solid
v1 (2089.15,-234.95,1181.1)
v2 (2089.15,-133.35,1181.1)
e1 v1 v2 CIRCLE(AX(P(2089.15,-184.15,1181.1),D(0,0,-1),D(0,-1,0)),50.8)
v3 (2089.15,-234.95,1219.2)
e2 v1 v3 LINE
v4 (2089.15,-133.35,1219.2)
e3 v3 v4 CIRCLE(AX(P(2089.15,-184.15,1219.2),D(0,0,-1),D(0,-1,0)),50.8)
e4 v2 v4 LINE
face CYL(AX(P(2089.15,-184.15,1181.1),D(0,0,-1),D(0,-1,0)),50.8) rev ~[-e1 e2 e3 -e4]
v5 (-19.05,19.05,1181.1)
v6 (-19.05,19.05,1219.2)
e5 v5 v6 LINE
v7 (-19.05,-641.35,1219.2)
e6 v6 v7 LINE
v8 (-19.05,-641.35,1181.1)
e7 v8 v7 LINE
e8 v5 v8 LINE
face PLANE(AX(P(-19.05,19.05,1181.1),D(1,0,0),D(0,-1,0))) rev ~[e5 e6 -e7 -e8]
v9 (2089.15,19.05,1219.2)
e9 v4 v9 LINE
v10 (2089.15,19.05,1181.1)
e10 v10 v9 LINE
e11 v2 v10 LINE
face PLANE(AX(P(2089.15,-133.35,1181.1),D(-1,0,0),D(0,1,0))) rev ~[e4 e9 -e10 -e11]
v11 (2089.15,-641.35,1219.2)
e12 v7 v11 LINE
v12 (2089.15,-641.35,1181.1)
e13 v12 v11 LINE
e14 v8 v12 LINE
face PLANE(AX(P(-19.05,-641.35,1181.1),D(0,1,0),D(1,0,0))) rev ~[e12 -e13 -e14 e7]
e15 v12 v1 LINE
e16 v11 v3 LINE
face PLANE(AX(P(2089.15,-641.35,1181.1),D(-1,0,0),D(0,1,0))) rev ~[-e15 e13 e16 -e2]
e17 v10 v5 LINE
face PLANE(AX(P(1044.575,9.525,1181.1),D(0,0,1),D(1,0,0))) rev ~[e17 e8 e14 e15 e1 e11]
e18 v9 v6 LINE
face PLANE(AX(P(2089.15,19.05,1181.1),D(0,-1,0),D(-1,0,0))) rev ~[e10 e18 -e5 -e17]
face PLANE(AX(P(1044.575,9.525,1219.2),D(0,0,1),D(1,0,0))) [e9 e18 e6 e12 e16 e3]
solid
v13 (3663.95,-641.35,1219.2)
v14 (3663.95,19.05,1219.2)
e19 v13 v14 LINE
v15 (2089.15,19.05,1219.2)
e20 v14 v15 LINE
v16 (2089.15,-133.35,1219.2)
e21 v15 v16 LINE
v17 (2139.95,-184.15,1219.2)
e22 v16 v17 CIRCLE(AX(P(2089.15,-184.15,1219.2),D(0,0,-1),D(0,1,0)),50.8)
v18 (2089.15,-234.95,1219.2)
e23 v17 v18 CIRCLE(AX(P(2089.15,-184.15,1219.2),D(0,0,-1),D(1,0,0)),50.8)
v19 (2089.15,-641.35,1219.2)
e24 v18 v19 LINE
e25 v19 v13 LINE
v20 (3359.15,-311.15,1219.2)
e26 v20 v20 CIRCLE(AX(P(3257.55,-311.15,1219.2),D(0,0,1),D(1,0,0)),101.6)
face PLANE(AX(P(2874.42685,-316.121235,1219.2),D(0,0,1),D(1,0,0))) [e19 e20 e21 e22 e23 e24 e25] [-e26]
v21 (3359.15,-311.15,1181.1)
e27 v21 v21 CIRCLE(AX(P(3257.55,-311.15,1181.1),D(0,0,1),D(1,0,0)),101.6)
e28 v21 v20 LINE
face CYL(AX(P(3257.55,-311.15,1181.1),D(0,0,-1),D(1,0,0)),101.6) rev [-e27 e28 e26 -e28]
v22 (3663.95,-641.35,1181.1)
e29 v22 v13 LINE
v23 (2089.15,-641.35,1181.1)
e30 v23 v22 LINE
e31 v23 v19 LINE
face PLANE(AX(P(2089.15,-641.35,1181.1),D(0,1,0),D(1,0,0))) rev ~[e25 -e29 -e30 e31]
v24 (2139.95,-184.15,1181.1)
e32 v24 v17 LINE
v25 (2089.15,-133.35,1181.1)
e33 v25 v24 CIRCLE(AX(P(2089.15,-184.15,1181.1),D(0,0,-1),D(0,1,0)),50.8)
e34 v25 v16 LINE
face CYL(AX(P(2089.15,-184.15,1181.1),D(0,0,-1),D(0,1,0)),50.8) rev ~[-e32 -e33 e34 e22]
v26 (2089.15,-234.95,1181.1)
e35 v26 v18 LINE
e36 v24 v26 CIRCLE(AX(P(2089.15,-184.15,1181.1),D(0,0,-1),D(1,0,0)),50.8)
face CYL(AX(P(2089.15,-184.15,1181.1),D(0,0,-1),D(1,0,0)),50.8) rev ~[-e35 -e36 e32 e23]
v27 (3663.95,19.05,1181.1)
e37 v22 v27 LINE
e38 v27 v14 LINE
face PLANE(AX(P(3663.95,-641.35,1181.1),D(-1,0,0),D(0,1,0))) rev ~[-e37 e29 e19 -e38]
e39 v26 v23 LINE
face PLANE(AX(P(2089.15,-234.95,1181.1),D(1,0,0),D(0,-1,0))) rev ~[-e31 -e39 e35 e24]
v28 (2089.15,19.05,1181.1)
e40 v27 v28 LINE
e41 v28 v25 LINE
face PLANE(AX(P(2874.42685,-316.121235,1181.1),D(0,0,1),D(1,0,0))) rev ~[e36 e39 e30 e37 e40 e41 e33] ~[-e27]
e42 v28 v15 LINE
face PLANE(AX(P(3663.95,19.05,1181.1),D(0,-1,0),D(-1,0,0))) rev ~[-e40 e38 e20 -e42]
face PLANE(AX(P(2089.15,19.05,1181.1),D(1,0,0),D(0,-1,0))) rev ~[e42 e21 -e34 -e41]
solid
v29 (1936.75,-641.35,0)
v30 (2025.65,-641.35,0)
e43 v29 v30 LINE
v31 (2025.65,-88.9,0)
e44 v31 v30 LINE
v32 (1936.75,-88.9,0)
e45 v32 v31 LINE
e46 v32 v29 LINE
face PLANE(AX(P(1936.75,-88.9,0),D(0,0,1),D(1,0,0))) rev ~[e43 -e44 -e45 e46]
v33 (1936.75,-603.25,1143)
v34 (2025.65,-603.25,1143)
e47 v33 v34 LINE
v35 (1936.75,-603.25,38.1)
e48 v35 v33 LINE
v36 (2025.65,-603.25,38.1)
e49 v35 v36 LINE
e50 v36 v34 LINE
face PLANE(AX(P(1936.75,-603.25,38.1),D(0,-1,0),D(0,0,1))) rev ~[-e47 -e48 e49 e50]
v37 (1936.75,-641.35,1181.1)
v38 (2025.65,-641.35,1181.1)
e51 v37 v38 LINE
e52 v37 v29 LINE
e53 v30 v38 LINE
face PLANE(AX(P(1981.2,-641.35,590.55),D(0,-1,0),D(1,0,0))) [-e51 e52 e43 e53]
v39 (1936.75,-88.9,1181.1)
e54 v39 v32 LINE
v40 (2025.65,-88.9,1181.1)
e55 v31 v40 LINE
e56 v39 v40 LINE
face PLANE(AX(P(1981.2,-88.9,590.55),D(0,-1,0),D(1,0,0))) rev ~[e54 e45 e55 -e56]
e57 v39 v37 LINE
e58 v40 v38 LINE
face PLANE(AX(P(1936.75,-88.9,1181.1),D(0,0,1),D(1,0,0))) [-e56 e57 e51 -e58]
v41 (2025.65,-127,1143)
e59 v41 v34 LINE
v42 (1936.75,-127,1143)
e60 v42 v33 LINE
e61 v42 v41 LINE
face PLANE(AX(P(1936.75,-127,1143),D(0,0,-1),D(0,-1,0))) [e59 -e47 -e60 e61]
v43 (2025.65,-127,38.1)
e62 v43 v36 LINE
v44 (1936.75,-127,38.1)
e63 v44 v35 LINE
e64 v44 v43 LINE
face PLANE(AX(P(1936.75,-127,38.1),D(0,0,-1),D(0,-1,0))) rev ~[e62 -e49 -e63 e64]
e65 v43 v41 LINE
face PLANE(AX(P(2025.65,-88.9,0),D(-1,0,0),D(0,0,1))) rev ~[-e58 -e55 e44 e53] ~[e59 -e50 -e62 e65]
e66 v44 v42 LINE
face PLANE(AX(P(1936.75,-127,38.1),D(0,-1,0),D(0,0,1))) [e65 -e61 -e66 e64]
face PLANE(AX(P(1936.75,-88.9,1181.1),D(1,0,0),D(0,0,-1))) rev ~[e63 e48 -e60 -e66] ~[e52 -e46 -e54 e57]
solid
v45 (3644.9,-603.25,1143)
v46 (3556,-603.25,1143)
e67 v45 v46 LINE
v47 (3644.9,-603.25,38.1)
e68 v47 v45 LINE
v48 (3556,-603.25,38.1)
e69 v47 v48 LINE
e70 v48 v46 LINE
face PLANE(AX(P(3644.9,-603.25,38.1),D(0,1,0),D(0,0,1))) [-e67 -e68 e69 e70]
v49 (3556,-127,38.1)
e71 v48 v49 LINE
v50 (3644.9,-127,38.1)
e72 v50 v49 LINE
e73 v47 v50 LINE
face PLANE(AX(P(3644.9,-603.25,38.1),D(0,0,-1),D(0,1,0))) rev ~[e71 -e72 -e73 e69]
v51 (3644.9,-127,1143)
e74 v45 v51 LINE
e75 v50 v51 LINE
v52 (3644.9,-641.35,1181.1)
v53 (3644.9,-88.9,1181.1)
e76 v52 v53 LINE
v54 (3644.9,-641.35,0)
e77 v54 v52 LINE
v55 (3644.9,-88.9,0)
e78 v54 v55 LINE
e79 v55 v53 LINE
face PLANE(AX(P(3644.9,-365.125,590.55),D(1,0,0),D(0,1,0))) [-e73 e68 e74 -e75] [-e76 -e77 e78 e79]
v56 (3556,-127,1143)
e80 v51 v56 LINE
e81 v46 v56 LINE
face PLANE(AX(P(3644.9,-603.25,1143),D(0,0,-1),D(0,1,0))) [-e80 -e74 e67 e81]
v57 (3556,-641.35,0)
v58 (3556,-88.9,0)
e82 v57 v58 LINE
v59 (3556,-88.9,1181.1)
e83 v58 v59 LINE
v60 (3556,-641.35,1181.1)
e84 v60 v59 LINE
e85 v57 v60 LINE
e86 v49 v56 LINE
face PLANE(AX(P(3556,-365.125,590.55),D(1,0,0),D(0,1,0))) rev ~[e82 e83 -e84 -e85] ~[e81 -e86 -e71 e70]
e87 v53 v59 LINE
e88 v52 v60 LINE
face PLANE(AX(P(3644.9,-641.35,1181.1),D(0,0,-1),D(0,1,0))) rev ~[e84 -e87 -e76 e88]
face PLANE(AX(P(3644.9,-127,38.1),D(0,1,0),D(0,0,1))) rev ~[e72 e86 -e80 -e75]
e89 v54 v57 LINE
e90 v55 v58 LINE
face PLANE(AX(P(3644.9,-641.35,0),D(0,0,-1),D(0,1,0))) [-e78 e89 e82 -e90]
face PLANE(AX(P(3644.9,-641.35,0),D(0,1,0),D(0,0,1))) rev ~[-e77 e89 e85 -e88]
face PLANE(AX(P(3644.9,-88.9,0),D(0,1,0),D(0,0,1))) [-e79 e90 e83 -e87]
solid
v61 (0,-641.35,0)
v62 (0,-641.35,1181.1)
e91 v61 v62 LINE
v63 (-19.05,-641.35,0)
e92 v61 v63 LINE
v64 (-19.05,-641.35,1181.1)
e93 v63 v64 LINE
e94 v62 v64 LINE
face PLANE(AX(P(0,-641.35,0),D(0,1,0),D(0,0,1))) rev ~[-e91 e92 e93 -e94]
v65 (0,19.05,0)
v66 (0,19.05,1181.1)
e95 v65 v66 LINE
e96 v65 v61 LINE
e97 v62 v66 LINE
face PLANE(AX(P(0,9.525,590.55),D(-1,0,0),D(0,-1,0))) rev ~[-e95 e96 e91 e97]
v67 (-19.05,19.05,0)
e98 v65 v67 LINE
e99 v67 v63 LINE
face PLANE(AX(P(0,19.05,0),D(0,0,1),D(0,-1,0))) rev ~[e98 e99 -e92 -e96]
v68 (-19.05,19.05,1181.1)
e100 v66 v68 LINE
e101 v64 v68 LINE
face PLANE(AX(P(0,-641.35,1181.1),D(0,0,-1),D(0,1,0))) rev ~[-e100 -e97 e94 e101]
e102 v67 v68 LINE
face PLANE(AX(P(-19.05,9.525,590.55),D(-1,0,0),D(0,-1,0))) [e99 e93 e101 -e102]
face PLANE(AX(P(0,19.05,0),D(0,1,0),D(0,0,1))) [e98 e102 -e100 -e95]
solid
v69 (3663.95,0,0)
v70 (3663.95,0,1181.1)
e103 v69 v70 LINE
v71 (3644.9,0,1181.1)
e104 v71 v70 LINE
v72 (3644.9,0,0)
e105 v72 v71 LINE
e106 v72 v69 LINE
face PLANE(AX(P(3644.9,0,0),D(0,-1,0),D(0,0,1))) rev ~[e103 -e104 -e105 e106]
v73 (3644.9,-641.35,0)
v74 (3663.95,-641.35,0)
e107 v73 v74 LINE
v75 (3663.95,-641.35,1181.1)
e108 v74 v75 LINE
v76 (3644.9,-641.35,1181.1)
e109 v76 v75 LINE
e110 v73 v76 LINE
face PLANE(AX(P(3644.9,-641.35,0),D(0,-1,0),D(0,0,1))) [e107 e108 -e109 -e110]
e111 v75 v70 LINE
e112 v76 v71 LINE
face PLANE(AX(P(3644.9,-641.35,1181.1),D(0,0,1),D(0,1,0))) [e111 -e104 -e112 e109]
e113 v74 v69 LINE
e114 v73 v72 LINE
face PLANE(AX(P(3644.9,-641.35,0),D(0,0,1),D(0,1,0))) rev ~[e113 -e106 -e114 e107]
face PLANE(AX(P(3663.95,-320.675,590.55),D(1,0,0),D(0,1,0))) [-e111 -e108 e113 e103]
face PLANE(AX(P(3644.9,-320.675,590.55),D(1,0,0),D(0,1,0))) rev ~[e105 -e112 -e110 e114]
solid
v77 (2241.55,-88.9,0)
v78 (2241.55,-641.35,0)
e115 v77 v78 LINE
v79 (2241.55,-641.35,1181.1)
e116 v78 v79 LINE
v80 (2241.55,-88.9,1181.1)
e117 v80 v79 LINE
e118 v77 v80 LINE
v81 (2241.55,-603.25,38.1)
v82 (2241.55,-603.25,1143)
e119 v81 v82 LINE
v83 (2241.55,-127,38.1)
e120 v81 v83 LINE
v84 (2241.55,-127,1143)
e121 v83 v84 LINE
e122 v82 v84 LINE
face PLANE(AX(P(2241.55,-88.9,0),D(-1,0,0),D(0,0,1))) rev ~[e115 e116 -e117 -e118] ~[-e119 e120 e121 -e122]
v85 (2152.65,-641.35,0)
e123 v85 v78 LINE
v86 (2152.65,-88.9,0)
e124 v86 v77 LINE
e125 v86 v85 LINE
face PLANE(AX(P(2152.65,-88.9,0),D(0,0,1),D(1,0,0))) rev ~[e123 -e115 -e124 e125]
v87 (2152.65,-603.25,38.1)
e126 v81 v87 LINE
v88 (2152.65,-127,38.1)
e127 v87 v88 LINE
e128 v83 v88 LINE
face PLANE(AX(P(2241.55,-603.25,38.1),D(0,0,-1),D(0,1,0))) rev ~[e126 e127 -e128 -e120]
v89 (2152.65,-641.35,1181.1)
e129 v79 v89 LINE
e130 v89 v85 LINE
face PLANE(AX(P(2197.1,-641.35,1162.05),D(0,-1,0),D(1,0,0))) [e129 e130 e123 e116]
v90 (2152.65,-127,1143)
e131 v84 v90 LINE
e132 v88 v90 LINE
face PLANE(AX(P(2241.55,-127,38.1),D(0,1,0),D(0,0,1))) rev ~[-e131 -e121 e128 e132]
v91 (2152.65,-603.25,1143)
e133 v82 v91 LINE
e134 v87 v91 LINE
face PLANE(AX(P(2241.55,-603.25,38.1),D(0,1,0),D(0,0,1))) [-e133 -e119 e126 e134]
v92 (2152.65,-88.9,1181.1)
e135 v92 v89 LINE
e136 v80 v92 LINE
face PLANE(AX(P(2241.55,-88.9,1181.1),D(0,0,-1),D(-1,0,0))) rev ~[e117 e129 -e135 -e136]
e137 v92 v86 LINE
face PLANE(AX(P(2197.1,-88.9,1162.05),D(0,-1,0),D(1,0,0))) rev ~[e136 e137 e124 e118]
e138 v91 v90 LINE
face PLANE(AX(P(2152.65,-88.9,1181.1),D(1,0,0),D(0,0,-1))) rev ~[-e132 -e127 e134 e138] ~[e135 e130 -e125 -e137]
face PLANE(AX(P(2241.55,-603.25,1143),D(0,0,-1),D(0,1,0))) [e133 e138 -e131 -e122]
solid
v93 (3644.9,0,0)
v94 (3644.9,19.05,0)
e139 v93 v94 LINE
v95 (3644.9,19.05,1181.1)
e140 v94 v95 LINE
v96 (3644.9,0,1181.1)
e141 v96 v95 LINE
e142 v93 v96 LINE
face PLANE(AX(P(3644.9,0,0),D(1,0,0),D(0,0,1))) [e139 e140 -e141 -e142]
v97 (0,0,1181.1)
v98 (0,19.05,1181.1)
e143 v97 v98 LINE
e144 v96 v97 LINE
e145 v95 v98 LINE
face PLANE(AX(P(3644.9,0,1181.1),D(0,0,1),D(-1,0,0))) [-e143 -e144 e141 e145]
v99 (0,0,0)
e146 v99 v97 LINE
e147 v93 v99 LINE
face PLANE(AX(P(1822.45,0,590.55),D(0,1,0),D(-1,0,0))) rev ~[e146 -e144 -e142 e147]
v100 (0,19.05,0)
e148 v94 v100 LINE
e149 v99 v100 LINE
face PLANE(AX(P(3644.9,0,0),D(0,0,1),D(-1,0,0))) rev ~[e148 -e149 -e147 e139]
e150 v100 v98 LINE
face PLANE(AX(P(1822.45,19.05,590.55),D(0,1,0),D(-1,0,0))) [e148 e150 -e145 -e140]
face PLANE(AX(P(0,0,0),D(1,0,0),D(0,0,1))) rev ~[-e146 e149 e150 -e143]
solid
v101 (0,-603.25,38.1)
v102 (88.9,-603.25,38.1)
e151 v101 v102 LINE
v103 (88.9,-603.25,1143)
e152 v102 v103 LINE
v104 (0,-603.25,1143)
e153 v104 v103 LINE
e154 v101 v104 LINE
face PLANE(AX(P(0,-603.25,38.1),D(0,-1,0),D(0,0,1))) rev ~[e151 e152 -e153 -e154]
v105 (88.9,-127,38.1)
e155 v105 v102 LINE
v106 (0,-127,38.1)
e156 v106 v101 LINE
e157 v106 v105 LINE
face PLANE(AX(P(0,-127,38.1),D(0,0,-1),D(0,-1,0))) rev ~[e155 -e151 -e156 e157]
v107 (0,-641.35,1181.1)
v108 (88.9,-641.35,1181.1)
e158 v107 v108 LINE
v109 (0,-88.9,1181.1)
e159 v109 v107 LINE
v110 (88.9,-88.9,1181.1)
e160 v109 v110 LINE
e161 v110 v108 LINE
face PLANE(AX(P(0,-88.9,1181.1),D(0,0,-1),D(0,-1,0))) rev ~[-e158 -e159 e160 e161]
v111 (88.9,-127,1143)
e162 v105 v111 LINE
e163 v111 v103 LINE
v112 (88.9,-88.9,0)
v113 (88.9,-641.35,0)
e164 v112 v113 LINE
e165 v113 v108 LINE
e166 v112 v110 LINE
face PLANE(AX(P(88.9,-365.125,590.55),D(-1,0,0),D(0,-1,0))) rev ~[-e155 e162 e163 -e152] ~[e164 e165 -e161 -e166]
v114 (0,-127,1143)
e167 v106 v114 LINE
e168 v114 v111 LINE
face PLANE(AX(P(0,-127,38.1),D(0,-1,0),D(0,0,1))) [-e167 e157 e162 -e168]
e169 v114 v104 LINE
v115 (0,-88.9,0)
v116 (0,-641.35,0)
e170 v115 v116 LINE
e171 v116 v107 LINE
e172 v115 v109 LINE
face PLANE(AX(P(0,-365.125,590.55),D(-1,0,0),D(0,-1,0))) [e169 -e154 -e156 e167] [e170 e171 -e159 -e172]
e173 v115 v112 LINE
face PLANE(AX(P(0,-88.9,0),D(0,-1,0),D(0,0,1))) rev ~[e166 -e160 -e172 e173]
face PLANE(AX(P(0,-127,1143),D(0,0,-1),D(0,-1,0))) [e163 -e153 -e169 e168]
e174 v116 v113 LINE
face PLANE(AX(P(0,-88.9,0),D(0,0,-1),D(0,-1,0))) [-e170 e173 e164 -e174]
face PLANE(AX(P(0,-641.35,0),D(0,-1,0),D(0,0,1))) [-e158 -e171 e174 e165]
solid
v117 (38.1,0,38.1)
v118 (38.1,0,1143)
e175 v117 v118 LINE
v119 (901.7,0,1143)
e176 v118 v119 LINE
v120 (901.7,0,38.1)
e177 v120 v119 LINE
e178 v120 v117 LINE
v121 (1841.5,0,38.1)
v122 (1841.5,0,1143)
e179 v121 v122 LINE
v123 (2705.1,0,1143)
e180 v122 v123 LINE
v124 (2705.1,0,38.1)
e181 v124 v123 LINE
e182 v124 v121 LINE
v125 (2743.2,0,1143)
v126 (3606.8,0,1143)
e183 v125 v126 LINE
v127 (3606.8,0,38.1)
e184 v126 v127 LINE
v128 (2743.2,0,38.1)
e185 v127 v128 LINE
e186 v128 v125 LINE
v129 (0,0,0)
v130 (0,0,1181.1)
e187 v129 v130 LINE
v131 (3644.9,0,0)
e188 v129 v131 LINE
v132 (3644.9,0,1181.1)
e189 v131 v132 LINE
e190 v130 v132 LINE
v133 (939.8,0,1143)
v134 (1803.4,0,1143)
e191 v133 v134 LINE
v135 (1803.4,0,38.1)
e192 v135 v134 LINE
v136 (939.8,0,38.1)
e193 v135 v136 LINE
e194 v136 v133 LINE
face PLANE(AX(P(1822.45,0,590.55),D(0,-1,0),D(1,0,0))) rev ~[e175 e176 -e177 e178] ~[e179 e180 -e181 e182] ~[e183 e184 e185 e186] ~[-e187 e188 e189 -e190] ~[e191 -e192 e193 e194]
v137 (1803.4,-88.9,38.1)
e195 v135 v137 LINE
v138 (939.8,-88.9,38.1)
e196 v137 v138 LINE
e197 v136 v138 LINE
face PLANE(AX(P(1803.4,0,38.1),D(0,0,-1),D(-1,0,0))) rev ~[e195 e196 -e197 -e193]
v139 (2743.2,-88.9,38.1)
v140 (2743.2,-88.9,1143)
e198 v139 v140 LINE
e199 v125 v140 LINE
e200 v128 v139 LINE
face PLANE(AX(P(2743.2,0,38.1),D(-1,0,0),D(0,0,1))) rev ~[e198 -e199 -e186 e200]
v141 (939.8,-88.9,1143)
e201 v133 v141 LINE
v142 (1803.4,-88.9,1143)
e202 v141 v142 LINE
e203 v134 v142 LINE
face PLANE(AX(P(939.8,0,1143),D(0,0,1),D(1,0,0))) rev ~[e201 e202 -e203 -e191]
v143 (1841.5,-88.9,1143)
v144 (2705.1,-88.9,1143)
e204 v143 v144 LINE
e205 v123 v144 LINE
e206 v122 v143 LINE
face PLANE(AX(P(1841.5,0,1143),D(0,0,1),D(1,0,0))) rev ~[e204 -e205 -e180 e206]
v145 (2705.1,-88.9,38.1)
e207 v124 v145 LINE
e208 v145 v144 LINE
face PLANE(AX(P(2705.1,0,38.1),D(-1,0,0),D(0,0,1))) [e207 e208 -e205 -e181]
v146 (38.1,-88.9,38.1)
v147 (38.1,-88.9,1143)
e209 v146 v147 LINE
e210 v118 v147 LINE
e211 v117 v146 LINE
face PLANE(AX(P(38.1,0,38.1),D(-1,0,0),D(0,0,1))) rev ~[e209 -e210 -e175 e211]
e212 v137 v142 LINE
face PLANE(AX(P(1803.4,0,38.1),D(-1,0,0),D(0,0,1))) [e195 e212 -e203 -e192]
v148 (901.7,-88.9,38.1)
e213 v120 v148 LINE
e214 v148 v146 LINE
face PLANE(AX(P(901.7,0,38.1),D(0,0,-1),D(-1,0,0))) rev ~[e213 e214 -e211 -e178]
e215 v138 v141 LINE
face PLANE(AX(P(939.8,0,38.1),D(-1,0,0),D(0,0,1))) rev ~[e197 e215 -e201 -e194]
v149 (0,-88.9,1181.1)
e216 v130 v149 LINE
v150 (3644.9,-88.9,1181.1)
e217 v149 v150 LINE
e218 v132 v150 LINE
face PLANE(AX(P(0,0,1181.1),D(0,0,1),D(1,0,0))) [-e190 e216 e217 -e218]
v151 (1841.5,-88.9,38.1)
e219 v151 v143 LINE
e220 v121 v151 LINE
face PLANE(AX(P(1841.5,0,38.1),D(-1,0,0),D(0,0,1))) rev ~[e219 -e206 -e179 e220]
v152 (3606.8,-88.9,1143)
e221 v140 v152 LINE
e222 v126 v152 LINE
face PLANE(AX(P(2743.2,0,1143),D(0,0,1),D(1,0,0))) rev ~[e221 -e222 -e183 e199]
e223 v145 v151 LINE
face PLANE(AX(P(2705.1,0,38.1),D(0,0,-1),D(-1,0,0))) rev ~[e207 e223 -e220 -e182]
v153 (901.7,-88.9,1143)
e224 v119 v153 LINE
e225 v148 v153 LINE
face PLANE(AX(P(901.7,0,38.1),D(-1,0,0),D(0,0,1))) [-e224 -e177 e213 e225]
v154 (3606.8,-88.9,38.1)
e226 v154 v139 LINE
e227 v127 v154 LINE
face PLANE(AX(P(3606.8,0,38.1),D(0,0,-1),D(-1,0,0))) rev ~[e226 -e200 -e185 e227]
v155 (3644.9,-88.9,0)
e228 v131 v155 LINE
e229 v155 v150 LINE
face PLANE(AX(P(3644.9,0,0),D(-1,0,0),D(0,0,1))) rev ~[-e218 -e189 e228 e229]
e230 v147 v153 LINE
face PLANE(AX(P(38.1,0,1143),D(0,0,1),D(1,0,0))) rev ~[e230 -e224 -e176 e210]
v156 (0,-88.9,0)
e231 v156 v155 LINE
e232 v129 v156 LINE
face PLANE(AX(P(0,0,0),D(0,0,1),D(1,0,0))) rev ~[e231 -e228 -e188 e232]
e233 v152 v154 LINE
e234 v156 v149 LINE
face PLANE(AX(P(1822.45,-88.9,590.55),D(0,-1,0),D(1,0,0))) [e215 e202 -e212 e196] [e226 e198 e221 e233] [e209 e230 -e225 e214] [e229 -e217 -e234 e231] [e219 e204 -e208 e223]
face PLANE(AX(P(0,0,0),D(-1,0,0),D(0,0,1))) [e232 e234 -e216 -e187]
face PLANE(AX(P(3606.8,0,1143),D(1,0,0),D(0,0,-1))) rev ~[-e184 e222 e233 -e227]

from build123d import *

# Parameters (mm, degrees)
F0_W      = 3644.9
F0_H      = 1181.1
F0_W_2    = 38.1
F0_H_2    = 1104.9
F1_DEPTH  = 88.9
F2_W      = 3644.9
F2_H      = 1181.1
F3_DEPTH  = 19.05
F4_W      = 2089.15
F4_H      = 19.05
F5_DEPTH  = 38.1
F4_R      = 101.6
F4_W_2    = 1555.75
F6_DEPTH  = 38.1
F7_W      = 552.45
F7_H      = 1181.1
F7_W_2    = 476.25
F7_H_2    = 1104.9
F8_DEPTH  = 88.9
F9_W      = 552.45
F9_H      = 1181.1
F9_W_2    = 476.25
F9_H_2    = 1104.9
F10_DEPTH = 88.9
F11_W     = 641.35
F11_H     = 1181.1
F12_DEPTH = 19.05
F13_W     = 19.05
F13_H     = 1181.1
F13_W_2   = 641.35
F14_DEPTH = 19.05
F15_W     = 88.9
F15_H     = 1104.9
F15_H_2   = 38.1
F16_DEPTH = 552.45
F17_W     = 476.25
F17_H     = 1104.9
F18_DEPTH = 88.9
F19_W     = 88.9
F19_H     = 1104.9
F19_H_2   = 38.1
F20_DEPTH = 552.45
F21_W     = 476.25
F21_H     = 1104.9
F22_DEPTH = 88.9


# Not quite as in the source:
# - a feature names something its author has since deleted; it is built from what else it names


with BuildPart() as f1:
    # F0 (on Front) → F1 (new body)
    with BuildSketch(Plane.XZ):
        with Locations((1822.45, 590.55)):
            Rectangle(F0_W, F0_H)
        Polygon((38.1, 38.1), (38.1, 1143), (901.7, 1143), (939.8, 1143), (1803.4, 1143), (1841.5, 1143), (2705.1, 1143), (2743.2, 1143), (3606.8, 1143), (3606.8, 38.1), (2743.2, 38.1), (2705.1, 38.1), (1841.5, 38.1), (1803.4, 38.1), (939.8, 38.1), (901.7, 38.1), align=None, mode=Mode.SUBTRACT)
        with Locations((920.75, 590.55)):
            Rectangle(F0_W_2, F0_H_2)
        with Locations((1822.45, 590.55)):
            Rectangle(F0_W_2, F0_H_2)
        with Locations((2724.15, 590.55)):
            Rectangle(F0_W_2, F0_H_2)
    extrude(amount=F1_DEPTH)


with BuildPart() as f3:
    # F2 (on face) → F3 (new body)
    with BuildSketch(Plane(origin=(0, 0, 0), x_dir=(-1, 0, 0), z_dir=(0, 1, 0))):
        with Locations((-1822.45, 590.55)):
            Rectangle(F2_W, F2_H)
    extrude(amount=F3_DEPTH)


with BuildPart() as f5:
    # F4 (on face) → F5 (new body)
    with BuildSketch(Plane.XY.offset(1181.1)):
        with Locations((1044.575, 9.525)):
            Rectangle(F4_W, F4_H)
        with BuildLine():
            ThreePointArc((2089.15, -234.95), (2038.35, -184.15), (2089.15, -133.35))
            Line((2089.15, -133.35), (2089.15, 0))
            Line((2089.15, 0), (0, 0))
            Line((0, 0), (0, 19.05))
            Line((0, 19.05), (-19.05, 19.05))
            Line((-19.05, 19.05), (-19.05, -641.35))
            Line((-19.05, -641.35), (2089.15, -641.35))
            Line((2089.15, -641.35), (2089.15, -234.95))
        make_face()
    extrude(amount=F5_DEPTH)


with BuildPart() as f6:
    # F4 (on face) → F6 (new body)
    with BuildSketch(Plane.XY.offset(1181.1)):
        with BuildLine():
            ThreePointArc((2089.15, -133.35), (2125.0710244843, -148.2289755157), (2139.95, -184.15))
            ThreePointArc((2139.95, -184.15), (2125.0710244843, -220.0710244843), (2089.15, -234.95))
            Line((2089.15, -234.95), (2089.15, -641.35))
            Line((2089.15, -641.35), (3663.95, -641.35))
            Line((3663.95, -641.35), (3663.95, 19.05))
            Line((3663.95, 19.05), (3644.9, 19.05))
            Line((3644.9, 19.05), (3644.9, 0))
            Line((3644.9, 0), (2089.15, 0))
            Line((2089.15, 0), (2089.15, -133.35))
        make_face()
        with Locations((3257.55, -311.15)):
            Circle(F4_R, mode=Mode.SUBTRACT)
        with Locations((2867.025, 9.525)):
            Rectangle(F4_W_2, F4_H)
    extrude(amount=F6_DEPTH)


with BuildPart() as f8:
    # F7 (on face) → F8 (new body)
    with BuildSketch(Plane(origin=(0, 0, 0), x_dir=(0, -1, 0), z_dir=(-1, 0, 0))):
        with Locations((365.125, 590.55)):
            Rectangle(F7_W, F7_H)
        with Locations((365.125, 590.55)):
            Rectangle(F7_W_2, F7_H_2, mode=Mode.SUBTRACT)
    extrude(amount=-F8_DEPTH)


with BuildPart() as f10:
    # F9 (on face) → F10 (new body)
    with BuildSketch(Plane.YZ.offset(3644.9)):
        with Locations((-365.125, 590.55)):
            Rectangle(F9_W, F9_H)
        with Locations((-365.125, 590.55)):
            Rectangle(F9_W_2, F9_H_2, mode=Mode.SUBTRACT)
    extrude(amount=-F10_DEPTH)


with BuildPart() as f12:
    # F11 (on face) → F12 (new body)
    with BuildSketch(Plane.YZ.offset(3644.9)):
        with Locations((-320.675, 590.55)):
            Rectangle(F11_W, F11_H)
    extrude(amount=F12_DEPTH)


with BuildPart() as f14:
    # F13 (on face) → F14 (new body)
    with BuildSketch(Plane(origin=(0, 0, 0), x_dir=(0, -1, 0), z_dir=(-1, 0, 0))):
        with Locations((-9.525, 590.55)):
            Rectangle(F13_W, F13_H)
        with Locations((320.675, 590.55)):
            Rectangle(F13_W_2, F13_H)
    extrude(amount=F14_DEPTH)


with BuildPart() as f16:
    # F15 (on face) → F16 (new body)
    with BuildSketch(Plane.XZ.offset(88.9)):
        Polygon((2152.65, 1181.1), (2152.65, 1143), (2241.55, 1143), (2241.55, 1181.1), (2216.15, 1181.1), align=None)
        with Locations((2197.1, 590.55)):
            Rectangle(F15_W, F15_H)
        with Locations((2197.1, 19.05)):
            Rectangle(F15_W, F15_H_2)
    extrude(amount=F16_DEPTH)

    # F17 (on face) → F18 (cut, through all)
    with BuildSketch(Plane.YZ.offset(2241.55)):
        with Locations((-365.125, 590.55)):
            Rectangle(F17_W, F17_H)
    extrude(amount=-F18_DEPTH, mode=Mode.SUBTRACT)


with BuildPart() as f20:
    # F19 (on face) → F20 (new body)
    with BuildSketch(Plane.XZ.offset(88.9)):
        with Locations((1981.2, 590.55)):
            Rectangle(F19_W, F19_H)
        with Locations((1981.2, 1162.05)):
            Rectangle(F19_W, F19_H_2)
        with Locations((1981.2, 19.05)):
            Rectangle(F19_W, F19_H_2)
    extrude(amount=F20_DEPTH)

    # F21 (on face) → F22 (cut, through all)
    with BuildSketch(Plane(origin=(1936.75, 0, 0), x_dir=(0, -1, 0), z_dir=(-1, 0, 0))):
        with Locations((365.125, 590.55)):
            Rectangle(F21_W, F21_H)
    extrude(amount=-F22_DEPTH, mode=Mode.SUBTRACT)


solid = Compound([f1.part, f3.part, f5.part, f6.part, f8.part, f10.part, f12.part, f14.part, f16.part, f20.part])
